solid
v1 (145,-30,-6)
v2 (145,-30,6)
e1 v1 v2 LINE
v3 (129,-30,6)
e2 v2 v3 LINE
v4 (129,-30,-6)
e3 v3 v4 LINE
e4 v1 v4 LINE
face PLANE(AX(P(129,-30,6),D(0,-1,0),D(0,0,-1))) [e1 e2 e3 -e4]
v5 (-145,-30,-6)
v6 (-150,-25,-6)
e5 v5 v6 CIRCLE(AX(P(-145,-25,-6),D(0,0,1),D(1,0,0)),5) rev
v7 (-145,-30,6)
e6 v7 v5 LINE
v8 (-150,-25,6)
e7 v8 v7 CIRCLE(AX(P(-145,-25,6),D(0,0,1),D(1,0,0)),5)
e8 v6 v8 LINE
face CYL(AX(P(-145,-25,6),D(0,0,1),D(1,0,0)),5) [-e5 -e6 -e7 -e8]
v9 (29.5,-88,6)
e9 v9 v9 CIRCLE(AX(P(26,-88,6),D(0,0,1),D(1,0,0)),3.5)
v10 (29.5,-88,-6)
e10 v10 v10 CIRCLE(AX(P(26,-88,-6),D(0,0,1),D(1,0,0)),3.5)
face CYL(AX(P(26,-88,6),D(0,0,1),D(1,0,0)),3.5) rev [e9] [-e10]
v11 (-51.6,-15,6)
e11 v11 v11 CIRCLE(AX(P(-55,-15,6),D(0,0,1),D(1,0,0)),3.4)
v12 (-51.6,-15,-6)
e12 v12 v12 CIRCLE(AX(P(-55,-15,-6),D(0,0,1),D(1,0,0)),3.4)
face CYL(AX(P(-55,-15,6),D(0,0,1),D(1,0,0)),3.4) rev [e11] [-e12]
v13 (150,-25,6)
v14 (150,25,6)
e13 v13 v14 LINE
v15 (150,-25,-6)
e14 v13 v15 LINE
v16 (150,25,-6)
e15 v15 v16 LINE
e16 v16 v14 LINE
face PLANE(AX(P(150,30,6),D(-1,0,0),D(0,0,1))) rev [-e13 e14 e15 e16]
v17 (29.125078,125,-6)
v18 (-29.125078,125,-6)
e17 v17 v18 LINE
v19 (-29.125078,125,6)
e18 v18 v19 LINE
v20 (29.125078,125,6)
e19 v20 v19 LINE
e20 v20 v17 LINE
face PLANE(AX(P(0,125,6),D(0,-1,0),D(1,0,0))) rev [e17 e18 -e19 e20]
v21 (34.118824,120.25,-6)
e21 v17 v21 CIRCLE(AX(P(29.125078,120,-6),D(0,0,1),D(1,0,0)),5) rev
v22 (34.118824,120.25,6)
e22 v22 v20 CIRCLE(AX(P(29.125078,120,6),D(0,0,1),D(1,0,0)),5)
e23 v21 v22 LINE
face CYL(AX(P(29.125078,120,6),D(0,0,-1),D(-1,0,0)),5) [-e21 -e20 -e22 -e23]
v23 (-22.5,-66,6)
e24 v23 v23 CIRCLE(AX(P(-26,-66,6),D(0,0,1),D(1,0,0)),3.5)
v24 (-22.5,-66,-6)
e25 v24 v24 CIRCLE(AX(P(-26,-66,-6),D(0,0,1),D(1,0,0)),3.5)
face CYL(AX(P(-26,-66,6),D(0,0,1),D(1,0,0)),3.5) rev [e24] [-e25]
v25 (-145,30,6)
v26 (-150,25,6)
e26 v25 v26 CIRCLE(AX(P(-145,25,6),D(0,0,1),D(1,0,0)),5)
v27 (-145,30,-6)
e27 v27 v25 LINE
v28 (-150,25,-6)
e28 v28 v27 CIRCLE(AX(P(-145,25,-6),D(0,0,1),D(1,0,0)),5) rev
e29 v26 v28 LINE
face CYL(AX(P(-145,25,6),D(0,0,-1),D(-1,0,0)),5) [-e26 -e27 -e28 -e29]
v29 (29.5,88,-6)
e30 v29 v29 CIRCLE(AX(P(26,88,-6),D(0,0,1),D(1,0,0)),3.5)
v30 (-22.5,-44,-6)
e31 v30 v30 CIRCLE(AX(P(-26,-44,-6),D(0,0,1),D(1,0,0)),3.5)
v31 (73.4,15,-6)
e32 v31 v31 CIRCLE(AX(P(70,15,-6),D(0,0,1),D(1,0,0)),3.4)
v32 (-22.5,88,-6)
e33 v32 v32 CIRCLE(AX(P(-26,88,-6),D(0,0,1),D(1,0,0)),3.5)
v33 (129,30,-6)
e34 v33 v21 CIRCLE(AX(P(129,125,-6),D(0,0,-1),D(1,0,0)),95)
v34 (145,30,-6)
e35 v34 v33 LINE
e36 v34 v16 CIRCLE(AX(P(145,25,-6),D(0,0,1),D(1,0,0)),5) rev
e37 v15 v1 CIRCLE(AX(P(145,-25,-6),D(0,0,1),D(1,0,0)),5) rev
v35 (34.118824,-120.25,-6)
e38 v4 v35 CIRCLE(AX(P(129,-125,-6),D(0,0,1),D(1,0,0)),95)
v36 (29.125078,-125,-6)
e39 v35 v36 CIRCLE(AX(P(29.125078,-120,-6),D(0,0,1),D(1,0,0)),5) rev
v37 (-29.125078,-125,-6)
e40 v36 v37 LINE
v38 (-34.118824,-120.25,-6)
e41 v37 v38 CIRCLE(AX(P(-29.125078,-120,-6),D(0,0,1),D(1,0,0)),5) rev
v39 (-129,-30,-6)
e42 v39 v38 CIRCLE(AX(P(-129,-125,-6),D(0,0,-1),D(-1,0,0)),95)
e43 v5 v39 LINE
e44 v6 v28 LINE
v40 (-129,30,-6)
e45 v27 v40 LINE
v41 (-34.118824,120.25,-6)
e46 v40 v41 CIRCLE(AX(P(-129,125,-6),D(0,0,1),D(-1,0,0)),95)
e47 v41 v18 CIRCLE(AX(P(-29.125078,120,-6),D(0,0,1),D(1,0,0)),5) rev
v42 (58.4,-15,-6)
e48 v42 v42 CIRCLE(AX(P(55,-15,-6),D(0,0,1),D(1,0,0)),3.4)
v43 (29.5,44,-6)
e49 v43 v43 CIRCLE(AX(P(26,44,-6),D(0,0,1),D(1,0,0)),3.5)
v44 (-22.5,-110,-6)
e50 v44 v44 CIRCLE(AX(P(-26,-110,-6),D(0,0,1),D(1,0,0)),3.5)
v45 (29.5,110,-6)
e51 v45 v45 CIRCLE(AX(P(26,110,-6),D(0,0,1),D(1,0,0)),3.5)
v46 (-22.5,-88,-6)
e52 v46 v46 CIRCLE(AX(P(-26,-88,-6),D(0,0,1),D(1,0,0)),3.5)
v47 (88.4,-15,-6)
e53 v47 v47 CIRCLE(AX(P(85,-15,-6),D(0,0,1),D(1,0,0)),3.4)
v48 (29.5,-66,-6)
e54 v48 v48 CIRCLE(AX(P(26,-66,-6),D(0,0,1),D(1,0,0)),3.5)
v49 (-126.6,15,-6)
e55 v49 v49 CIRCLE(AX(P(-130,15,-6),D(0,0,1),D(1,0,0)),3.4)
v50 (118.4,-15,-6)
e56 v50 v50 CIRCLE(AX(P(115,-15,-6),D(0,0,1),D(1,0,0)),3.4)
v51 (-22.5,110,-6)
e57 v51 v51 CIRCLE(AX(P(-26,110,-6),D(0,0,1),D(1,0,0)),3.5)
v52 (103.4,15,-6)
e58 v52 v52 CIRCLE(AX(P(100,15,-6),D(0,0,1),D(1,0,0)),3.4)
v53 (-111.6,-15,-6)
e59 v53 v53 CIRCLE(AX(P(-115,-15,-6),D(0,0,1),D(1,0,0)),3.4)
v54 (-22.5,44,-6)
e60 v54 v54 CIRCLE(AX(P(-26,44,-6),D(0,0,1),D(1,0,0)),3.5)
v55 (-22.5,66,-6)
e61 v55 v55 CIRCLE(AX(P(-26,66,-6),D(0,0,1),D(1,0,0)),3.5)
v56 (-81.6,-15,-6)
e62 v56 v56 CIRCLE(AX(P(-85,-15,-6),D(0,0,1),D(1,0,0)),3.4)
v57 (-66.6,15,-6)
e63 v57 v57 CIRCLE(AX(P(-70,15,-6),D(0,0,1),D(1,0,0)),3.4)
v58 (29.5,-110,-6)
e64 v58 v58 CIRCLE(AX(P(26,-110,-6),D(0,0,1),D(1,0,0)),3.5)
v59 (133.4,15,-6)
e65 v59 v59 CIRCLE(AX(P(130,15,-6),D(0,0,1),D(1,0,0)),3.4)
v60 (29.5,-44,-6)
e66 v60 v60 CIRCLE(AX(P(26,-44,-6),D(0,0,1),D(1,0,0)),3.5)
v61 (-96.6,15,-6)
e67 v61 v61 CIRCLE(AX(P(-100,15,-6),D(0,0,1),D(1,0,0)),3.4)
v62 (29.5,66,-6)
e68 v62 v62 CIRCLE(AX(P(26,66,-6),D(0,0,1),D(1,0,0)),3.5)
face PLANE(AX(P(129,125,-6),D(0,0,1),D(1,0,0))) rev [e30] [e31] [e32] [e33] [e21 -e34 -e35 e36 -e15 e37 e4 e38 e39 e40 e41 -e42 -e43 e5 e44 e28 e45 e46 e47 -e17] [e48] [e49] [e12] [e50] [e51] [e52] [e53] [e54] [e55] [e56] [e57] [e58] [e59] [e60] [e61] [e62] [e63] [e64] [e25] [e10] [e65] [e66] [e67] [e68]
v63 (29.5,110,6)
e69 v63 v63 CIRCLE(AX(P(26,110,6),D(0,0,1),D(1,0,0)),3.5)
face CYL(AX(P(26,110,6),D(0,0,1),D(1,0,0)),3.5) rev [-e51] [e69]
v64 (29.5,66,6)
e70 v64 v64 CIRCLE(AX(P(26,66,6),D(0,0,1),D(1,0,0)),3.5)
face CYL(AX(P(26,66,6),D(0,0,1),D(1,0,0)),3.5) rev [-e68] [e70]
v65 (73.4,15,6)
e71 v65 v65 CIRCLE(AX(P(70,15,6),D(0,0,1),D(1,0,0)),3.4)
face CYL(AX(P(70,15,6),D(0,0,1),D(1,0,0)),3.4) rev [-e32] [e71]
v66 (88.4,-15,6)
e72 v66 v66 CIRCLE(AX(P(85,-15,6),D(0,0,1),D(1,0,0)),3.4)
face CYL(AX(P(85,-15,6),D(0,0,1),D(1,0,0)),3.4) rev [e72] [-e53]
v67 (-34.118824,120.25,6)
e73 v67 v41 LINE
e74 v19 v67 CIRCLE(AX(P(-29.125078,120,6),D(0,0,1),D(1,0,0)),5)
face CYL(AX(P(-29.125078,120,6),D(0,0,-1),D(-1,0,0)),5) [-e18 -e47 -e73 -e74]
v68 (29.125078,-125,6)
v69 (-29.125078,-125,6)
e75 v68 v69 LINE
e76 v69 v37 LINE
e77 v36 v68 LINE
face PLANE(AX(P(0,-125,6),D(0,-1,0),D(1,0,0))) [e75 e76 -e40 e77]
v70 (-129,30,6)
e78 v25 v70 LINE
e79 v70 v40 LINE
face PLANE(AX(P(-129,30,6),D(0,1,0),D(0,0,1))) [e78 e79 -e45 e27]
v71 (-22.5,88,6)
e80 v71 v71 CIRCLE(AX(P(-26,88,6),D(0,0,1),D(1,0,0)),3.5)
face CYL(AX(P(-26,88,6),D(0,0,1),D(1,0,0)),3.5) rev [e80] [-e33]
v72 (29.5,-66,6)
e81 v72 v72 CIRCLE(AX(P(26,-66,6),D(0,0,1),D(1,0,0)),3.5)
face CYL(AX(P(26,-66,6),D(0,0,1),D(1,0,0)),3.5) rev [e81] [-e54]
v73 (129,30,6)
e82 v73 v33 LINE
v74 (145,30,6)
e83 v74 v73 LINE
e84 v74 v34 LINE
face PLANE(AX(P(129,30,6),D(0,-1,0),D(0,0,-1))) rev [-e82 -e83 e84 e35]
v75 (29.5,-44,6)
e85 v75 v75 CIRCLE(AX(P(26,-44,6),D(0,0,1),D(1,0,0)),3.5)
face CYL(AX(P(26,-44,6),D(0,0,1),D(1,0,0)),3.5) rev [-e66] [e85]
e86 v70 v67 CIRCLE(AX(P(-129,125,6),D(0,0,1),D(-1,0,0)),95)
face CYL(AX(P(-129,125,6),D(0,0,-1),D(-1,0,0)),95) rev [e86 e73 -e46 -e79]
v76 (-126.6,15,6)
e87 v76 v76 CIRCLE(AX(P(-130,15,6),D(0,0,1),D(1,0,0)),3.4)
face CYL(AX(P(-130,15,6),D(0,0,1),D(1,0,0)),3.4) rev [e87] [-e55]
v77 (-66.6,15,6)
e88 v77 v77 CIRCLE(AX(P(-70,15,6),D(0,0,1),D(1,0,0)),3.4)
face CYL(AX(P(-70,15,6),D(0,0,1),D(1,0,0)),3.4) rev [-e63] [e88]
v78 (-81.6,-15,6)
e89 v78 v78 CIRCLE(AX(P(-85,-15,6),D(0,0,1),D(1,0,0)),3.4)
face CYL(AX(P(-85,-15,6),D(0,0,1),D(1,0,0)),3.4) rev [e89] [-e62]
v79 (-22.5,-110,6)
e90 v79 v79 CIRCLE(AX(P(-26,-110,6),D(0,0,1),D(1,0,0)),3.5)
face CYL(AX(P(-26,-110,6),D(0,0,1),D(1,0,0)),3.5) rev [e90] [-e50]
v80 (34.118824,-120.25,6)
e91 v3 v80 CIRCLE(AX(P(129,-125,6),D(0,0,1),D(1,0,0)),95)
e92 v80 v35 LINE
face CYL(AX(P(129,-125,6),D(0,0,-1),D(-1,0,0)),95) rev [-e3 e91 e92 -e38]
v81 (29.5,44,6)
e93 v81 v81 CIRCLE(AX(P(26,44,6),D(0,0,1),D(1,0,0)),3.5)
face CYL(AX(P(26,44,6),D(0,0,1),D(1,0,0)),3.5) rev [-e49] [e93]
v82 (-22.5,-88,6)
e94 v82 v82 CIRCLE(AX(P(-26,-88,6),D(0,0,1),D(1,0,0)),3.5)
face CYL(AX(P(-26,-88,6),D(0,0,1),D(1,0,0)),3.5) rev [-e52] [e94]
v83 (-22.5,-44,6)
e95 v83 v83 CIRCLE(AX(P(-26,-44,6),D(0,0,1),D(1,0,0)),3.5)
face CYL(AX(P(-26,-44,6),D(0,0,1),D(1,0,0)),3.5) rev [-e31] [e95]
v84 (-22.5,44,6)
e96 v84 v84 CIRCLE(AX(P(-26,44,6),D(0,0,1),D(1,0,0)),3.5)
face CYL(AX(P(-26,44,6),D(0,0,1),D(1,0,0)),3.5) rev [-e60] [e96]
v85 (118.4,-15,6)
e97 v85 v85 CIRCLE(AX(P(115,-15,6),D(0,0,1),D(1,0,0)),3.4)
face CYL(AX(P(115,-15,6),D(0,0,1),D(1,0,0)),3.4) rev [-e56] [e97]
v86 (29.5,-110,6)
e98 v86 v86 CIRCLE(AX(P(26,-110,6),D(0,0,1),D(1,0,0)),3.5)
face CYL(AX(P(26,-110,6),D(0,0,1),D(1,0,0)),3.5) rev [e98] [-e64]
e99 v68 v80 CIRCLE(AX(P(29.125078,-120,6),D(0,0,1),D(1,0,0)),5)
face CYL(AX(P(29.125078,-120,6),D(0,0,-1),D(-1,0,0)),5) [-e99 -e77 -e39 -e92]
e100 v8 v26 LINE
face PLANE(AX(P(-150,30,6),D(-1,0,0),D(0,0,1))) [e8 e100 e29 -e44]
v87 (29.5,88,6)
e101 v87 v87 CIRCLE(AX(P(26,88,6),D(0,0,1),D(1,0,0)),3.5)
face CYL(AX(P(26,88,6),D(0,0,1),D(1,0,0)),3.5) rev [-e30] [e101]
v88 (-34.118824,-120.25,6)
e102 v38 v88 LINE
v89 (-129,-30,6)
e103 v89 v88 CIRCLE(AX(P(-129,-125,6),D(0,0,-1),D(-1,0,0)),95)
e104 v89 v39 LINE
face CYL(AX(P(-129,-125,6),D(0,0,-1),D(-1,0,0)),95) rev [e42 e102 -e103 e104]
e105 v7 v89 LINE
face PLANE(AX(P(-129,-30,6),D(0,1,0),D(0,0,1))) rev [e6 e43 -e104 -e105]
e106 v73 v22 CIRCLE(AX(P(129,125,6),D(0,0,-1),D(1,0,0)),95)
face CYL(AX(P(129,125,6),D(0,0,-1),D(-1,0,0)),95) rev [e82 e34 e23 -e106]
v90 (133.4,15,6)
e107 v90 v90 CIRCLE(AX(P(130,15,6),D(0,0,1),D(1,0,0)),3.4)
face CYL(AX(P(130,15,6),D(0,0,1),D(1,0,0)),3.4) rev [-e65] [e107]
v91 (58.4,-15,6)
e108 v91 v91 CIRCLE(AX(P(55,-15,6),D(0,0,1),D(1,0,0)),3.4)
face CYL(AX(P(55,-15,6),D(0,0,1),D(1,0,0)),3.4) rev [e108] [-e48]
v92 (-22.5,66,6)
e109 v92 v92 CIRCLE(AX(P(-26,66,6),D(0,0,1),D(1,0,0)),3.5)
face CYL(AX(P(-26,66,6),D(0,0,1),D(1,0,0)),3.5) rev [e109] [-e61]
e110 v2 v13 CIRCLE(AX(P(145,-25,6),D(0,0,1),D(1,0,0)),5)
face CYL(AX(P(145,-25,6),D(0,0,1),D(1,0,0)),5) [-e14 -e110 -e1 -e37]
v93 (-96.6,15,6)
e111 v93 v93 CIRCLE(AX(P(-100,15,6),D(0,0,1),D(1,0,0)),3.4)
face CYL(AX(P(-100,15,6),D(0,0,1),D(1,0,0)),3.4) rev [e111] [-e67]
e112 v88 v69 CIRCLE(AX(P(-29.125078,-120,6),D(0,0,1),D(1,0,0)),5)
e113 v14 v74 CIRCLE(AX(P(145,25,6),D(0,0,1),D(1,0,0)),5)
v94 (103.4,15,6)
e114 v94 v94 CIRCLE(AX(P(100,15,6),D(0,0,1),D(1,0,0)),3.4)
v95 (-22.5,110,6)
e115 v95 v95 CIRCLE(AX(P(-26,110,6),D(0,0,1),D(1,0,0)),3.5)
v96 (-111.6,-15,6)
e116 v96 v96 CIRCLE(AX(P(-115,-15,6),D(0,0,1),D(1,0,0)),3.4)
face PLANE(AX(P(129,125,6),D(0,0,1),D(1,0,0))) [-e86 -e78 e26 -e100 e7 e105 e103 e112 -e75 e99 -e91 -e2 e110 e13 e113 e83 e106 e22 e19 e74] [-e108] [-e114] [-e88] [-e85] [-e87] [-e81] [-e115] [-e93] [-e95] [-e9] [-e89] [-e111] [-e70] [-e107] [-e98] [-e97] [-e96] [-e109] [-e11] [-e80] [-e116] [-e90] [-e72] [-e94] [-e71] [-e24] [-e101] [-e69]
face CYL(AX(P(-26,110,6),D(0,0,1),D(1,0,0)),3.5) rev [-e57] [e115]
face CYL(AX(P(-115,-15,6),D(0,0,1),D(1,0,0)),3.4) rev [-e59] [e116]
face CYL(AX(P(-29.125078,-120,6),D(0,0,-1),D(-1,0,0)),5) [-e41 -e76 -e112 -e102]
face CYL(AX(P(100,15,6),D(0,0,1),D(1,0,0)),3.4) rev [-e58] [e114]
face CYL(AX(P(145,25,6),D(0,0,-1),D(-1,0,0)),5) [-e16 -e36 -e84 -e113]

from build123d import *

# Parameters (mm, degrees)
BOSS_EXTRUDE1_DEPTH        = 6
F_7_0_7_DIAMETER_HOLE1_D   = 7
LPATTERN1_COUNT            = 4
LPATTERN1_PITCH            = 22
FILLET1_R                  = 5
MIRROR1_COPY_1_D           = 7
MIRROR1_COPY_2_D           = 7
MIRROR1_COPY_3_D           = 7
FILLET1_OF_MIRROR1_R       = 5
MIRROR5_COPY_1_D           = 7
MIRROR5_COPY_2_D           = 7
MIRROR5_COPY_3_D           = 7
FILLET1_OF_MIRROR5_R       = 5
MIRROR6_START              = -6
MIRROR6_OUTLINE_R          = 3.5
MIRROR6_DEPTH              = 12
F_6_8_6_8_DIAMETER_HOLE1_D = 6.8


# Read off the part's stored shape, not the designer's step: Mirror6
with BuildPart() as part:
    # Sketch1 → Boss-Extrude1 (new, symmetric)
    with BuildSketch(Plane.XY):
        with BuildLine():
            Line((0, 0), (0, 125))
            Line((0, 125), (34, 125))
            ThreePointArc((34, 125), (61.824855787, 57.824855787), (129, 30))
            Line((129, 30), (150, 30))
            Line((150, 30), (150, 0))
            Line((150, 0), (114.303256495, 0))
            Line((114.303256495, 0), (0, 0))
        make_face()
    boss_extrude1 = extrude(amount=BOSS_EXTRUDE1_DEPTH, both=True)

    # Ø7.0 (7) Diameter Hole1 (through all)
    with Locations(Plane.XY.offset(6)):
        with Locations((26, 110)):
            f_7_0_7_diameter_hole1 = Hole(F_7_0_7_DIAMETER_HOLE1_D / 2)

    # LPattern1: Ø7.0 (7) Diameter Hole1 ×4
    with Locations(*[(0, -i * LPATTERN1_PITCH, 0) for i in range(1, LPATTERN1_COUNT)]):
        add(f_7_0_7_diameter_hole1, mode=Mode.SUBTRACT)

    # Fillet1
    fillet1_edges = [part.edges().sort_by_distance(p)[0] for p in [
        (34, 125, 0),
        (150, 30, 0),
    ]]
    fillet(fillet1_edges, radius=FILLET1_R)

    # Mirror1: Boss-Extrude1, Ø7.0 (7) Diameter Hole1 across plane
    add(boss_extrude1.mirror(Plane(origin=(0, 0, 6), x_dir=(0, 0, 1), z_dir=(1, 0, 0))))
    add(f_7_0_7_diameter_hole1.mirror(Plane(origin=(0, 0, 6), x_dir=(0, 0, 1), z_dir=(1, 0, 0))), mode=Mode.SUBTRACT)

    # Mirror1 copy 1 (through all)
    with Locations(Plane(origin=(0, -22, 6), x_dir=(-1, 0, 0), z_dir=(0, 0, 1))):
        with Locations((26, -110)):
            Hole(MIRROR1_COPY_1_D / 2)

    # Mirror1 copy 2 (through all)
    with Locations(Plane(origin=(0, -44, 6), x_dir=(-1, 0, 0), z_dir=(0, 0, 1))):
        with Locations((26, -110)):
            Hole(MIRROR1_COPY_2_D / 2)

    # Mirror1 copy 3 (through all)
    with Locations(Plane(origin=(0, -66, 6), x_dir=(-1, 0, 0), z_dir=(0, 0, 1))):
        with Locations((26, -110)):
            Hole(MIRROR1_COPY_3_D / 2)

    # Fillet1 of Mirror1
    fillet1_of_mirror1_edges = [part.edges().sort_by_distance(p)[0] for p in [
        (-34, 125, 0),
        (-150, 30, 0),
    ]]
    fillet(fillet1_of_mirror1_edges, radius=FILLET1_OF_MIRROR1_R)

    # Mirror5: Boss-Extrude1, Ø7.0 (7) Diameter Hole1 across plane
    add(boss_extrude1.mirror(Plane.ZX))
    add(f_7_0_7_diameter_hole1.mirror(Plane.ZX), mode=Mode.SUBTRACT)

    # Mirror5 copy 1 (through all)
    with Locations(Plane(origin=(0, 22, 6), x_dir=(1, 0, 0), z_dir=(0, 0, 1))):
        with Locations((26, -110)):
            Hole(MIRROR5_COPY_1_D / 2)

    # Mirror5 copy 2 (through all)
    with Locations(Plane(origin=(0, 44, 6), x_dir=(1, 0, 0), z_dir=(0, 0, 1))):
        with Locations((26, -110)):
            Hole(MIRROR5_COPY_2_D / 2)

    # Mirror5 copy 3 (through all)
    with Locations(Plane(origin=(0, 66, 6), x_dir=(1, 0, 0), z_dir=(0, 0, 1))):
        with Locations((26, -110)):
            Hole(MIRROR5_COPY_3_D / 2)

    # Fillet1 of Mirror5
    fillet1_of_mirror5_edges = [part.edges().sort_by_distance(p)[0] for p in [
        (34, -125, 0),
        (150, -30, 0),
    ]]
    fillet(fillet1_of_mirror5_edges, radius=FILLET1_OF_MIRROR5_R)

    # Mirror6 outline → Mirror6 (add)
    with BuildSketch(Plane.XY.offset(MIRROR6_START)):
        with BuildLine():
            Line((0, 0), (-150, 0))
            Line((-150, 0), (-150, -25))
            ThreePointArc((-150, -25), (-148.535533906, -28.535533906), (-145, -30))
            Line((-145, -30), (-129, -30))
            ThreePointArc((-129, -30), (-63.525768428, -56.165960456), (-34.118824312, -120.25))
            ThreePointArc((-34.118824312, -120.25), (-32.571090411, -123.622844187), (-29.125078223, -125))
            Line((-29.125078223, -125), (0, -125))
            Line((0, -125), (0, 0))
        make_face()
        with Locations((-26, -110)):
            Circle(MIRROR6_OUTLINE_R, mode=Mode.SUBTRACT)
        with Locations((-26, -88)):
            Circle(MIRROR6_OUTLINE_R, mode=Mode.SUBTRACT)
        with Locations((-26, -66)):
            Circle(MIRROR6_OUTLINE_R, mode=Mode.SUBTRACT)
        with Locations((-26, -44)):
            Circle(MIRROR6_OUTLINE_R, mode=Mode.SUBTRACT)
    extrude(amount=MIRROR6_DEPTH)

    # Ø6.8 (6.8) Diameter Hole1 (through all)
    with Locations(Plane.XY.offset(6)):
        with Locations((130, 15), (100, 15), (70, 15), (115, -15), (85, -15), (55, -15)):
            f_6_8_6_8_diameter_hole1 = Hole(F_6_8_6_8_DIAMETER_HOLE1_D / 2)

    # Mirror7: Ø6.8 (6.8) Diameter Hole1 across plane
    add(f_6_8_6_8_diameter_hole1.mirror(Plane(origin=(0, 0, 0), x_dir=(0, 0, 1), z_dir=(1, 0, 0))), mode=Mode.SUBTRACT)


solid = part.part
